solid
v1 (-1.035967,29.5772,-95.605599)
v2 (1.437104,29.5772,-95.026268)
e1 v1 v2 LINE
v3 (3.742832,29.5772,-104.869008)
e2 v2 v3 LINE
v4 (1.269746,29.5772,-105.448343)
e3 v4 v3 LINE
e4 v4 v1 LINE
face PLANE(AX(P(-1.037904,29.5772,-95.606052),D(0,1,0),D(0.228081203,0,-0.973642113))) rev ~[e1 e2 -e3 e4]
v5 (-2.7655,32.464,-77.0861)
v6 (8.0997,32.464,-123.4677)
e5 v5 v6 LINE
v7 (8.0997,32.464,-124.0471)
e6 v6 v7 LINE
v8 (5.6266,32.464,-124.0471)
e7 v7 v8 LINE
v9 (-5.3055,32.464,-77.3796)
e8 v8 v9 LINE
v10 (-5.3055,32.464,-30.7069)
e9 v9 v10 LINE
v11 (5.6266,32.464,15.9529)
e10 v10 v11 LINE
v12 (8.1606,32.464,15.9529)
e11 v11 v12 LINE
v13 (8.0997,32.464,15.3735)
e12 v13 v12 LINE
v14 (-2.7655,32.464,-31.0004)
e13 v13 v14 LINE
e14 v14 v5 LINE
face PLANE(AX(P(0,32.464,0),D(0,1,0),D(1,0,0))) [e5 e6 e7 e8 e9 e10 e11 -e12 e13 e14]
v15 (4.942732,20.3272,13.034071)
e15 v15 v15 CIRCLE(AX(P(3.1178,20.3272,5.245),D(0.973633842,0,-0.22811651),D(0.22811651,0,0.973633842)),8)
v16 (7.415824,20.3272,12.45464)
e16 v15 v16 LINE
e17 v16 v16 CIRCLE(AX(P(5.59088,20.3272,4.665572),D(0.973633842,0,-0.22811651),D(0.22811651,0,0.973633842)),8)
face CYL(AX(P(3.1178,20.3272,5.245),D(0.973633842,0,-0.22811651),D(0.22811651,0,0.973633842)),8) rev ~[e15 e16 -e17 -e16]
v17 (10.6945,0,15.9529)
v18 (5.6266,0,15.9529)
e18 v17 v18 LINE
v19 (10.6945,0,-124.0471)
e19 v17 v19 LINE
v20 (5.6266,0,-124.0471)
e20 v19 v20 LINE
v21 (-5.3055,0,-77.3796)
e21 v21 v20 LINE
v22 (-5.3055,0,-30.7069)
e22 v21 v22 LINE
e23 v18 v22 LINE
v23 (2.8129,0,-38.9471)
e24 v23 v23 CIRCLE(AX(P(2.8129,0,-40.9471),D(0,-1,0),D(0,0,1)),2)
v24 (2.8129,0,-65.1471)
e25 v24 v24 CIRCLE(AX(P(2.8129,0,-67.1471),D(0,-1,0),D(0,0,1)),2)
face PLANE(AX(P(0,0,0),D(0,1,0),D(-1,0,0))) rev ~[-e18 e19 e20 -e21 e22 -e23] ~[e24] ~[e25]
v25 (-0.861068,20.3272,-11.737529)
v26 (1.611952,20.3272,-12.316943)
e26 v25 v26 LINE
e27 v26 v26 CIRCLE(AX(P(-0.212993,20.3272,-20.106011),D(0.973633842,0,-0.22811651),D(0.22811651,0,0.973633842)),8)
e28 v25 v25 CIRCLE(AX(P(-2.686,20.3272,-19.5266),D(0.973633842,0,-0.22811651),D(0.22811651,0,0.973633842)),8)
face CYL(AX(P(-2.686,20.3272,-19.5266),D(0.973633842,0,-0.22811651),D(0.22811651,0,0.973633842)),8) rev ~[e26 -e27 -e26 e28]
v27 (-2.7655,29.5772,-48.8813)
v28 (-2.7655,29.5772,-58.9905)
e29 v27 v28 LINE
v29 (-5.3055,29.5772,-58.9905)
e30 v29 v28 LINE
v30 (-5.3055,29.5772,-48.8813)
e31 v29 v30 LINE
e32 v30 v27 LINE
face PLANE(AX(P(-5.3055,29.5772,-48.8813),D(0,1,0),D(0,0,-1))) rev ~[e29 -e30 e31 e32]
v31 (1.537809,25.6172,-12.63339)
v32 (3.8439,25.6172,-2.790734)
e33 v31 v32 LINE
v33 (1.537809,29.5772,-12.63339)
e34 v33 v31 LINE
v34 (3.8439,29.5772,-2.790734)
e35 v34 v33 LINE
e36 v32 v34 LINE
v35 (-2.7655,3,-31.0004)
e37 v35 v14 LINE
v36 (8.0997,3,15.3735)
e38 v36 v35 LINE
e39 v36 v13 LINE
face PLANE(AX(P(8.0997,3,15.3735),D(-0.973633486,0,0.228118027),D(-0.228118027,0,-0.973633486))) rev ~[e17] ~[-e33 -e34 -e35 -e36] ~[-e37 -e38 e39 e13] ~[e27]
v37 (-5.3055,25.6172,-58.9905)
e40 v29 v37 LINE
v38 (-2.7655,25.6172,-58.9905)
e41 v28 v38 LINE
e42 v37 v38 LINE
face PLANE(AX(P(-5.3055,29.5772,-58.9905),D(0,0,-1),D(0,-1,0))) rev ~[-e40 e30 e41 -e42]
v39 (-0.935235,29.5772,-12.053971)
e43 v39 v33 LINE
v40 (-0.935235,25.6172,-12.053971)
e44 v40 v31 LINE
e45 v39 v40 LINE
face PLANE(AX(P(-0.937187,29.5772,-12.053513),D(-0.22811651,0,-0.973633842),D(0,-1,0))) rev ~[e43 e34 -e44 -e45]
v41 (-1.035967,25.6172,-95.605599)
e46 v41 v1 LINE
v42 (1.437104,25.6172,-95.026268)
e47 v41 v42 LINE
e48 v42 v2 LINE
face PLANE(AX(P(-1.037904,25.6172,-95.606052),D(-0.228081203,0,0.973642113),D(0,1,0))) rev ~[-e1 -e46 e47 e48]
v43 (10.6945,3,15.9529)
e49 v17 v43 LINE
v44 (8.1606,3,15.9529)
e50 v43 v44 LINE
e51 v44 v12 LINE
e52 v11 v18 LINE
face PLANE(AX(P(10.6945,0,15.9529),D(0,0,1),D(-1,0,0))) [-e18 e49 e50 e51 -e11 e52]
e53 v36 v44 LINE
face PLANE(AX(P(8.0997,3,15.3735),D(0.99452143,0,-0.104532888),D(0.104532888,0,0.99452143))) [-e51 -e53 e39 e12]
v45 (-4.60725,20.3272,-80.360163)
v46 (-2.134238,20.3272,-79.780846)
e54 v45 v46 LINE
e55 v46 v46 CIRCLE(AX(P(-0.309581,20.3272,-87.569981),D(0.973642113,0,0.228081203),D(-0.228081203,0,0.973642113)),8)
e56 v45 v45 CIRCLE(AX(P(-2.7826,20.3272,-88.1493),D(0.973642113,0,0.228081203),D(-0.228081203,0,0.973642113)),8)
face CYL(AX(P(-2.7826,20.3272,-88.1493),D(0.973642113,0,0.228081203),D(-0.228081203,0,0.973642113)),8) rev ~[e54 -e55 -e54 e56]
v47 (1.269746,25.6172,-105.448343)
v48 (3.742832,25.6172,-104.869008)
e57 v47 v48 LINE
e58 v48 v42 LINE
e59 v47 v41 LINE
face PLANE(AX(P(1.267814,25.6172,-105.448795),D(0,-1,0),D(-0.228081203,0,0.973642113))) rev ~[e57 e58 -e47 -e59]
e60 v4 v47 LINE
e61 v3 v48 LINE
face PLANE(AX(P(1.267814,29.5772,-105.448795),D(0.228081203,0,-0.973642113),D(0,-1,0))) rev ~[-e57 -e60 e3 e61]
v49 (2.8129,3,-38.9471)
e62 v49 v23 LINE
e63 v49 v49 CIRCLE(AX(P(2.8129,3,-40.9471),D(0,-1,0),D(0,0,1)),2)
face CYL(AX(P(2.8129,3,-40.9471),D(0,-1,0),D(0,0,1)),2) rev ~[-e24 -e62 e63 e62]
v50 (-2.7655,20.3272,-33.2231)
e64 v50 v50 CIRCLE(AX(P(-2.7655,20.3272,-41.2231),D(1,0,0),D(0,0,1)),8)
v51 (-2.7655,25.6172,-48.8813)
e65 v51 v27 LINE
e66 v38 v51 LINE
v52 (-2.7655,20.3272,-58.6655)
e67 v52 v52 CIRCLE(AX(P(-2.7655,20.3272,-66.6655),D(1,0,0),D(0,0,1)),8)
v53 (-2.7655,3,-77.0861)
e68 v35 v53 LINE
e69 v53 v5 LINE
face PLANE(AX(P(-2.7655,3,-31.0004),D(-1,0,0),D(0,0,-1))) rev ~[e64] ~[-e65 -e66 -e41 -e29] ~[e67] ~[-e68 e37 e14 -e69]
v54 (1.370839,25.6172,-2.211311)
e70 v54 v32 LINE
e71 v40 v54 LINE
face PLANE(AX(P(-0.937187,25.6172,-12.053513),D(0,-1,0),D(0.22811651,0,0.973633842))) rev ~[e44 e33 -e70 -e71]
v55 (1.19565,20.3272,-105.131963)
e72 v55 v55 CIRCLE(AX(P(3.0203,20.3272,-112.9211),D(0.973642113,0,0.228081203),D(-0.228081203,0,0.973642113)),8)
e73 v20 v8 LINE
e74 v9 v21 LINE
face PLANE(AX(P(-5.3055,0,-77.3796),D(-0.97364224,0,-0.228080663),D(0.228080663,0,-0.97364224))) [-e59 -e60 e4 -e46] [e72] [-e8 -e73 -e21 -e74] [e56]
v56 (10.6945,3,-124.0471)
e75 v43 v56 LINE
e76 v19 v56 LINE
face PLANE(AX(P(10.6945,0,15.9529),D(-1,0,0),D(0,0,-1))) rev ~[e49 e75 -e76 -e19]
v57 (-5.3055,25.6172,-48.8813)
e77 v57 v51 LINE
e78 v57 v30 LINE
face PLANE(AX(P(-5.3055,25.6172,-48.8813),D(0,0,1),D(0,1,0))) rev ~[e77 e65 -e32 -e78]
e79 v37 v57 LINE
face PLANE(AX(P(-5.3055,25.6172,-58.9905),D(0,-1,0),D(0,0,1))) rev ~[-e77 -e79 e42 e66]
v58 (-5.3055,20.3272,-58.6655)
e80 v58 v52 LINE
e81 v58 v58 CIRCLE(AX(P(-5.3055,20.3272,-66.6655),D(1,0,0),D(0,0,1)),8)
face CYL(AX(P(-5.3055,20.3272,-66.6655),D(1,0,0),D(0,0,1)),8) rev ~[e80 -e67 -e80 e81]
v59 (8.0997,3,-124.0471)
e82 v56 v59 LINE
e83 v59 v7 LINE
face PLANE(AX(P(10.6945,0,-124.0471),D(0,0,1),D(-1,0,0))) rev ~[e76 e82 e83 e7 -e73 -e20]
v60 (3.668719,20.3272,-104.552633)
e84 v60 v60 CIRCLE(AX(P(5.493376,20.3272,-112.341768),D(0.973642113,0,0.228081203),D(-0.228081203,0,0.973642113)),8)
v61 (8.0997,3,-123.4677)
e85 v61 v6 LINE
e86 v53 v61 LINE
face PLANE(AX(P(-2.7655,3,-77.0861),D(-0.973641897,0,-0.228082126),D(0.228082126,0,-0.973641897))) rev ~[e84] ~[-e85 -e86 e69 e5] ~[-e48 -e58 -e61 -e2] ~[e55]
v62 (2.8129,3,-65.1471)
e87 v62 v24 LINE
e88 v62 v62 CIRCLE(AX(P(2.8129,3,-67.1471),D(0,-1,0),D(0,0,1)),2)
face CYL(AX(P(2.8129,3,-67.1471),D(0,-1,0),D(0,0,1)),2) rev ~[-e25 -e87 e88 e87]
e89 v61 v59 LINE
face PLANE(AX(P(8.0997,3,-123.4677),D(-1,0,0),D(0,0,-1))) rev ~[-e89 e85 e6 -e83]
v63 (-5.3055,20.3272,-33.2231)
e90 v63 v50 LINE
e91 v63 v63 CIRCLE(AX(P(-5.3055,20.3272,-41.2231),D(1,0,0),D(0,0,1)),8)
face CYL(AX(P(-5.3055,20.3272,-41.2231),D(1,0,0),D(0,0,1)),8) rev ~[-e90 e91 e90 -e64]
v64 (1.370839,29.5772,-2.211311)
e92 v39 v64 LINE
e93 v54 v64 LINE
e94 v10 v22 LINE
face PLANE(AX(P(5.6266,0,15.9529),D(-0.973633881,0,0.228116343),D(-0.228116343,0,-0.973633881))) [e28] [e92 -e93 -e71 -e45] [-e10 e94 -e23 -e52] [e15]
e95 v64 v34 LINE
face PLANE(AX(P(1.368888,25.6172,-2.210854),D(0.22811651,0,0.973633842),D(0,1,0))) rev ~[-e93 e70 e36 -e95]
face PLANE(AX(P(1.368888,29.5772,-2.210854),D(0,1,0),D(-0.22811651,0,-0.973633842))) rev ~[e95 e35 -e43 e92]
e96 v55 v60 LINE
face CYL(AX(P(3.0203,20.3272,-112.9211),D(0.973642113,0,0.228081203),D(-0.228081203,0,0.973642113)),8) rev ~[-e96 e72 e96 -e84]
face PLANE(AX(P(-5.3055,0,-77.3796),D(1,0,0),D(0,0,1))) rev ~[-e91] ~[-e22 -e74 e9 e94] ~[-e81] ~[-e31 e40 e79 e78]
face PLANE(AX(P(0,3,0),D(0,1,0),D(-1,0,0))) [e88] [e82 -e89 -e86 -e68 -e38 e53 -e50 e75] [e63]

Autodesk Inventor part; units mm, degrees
ref_plane "YZ Plane" through (0, 0, 0) normal (1, 0, 0) x (0, 1, 0)
ref_plane "XZ Plane" through (0, 0, 0) normal (0, 1, 0) x (-1, 0, 0)
ref_plane "XY Plane" through (0, 0, 0) normal (0, 0, 1) x (1, 0, 0)
sketch "Base" plane through (0, 0, 0) normal (0, 1, 0) x (-1, 0, 0)
  line L0 (-10.6945, 15.9529) -> (-10.6945, -124.0471)
  line L1 (5.3055, -77.3796) -> (5.3055, -30.7069)
  line L2 (-10.6945, 15.9529) -> (-5.6266, 15.9529)
  line L3 (-5.6266, 15.9529) -> (5.3055, -30.7069)
  line L4 (-10.6945, -124.0471) -> (-5.6266, -124.0471)
  line L5 (5.3055, -77.3796) -> (-5.6266, -124.0471)
  point P0 (0, 0)
  dimension "d1" = 140
extrude "Extrusion1" add sketch "Base" along normal blind 3
sketch "FrontWall" plane through (0, 3, 0) normal (0, 1, 0) x (1, 0, 0)
  line L0 (-5.3055, 30.7069) -> (5.6266, -15.9529) projected
  line L1 (-5.3055, 77.3796) -> (-5.3055, 30.7069) projected
  line L2 (5.6266, 124.0471) -> (-5.3055, 77.3796) projected
  line L3 (8.0997, -15.3735) -> (-2.7655, 31.0004)
  line L4 (-2.7655, 31.0004) -> (-2.7655, 77.0861)
  line L5 (-2.7655, 77.0861) -> (8.0997, 123.4677)
  line L6 (8.0997, -15.3735) -> (8.1606, -15.9529)
  line L7 (5.6266, -15.9529) -> (10.6945, -15.9529) projected
  line L8 (8.0997, 123.4677) -> (8.0997, 124.0471)
  line L9 (10.6945, 124.0471) -> (5.6266, 124.0471) projected
  point P0 (0, 0)
  dimension "d6" = 2.54
extrude "Extrusion2" add sketch "FrontWall" along normal blind 29.464
sketch "Sketch3" plane through (-5.3055, 0, -77.3796) normal (-0.9736421, 0, -0.2280812) x (-0.2280812, 0, 0.9736421)
  line L0 (-47.9308, 0) -> (-47.9308, 32.464) projected
  line L1 (0, 0) -> (0, 32.464) projected
  line L2 (-1.0536, 30.5772) -> (-46.5036, 30.5772)
  line L3 (-46.5036, 30.5772) -> (-46.5036, 10.0772)
  line L4 (-46.5036, 10.0772) -> (-1.0536, 10.0772)
  line L5 (-1.0536, 10.0772) -> (-1.0536, 30.5772)
  line L6 (-23.7786, 29.5772) -> (-28.8286, 29.5772)
  line L7 (-28.8286, 29.5772) -> (-28.8286, 25.6172)
  line L8 (-28.8286, 25.6172) -> (-18.7194, 25.6172)
  line L9 (-18.7194, 25.6172) -> (-18.7194, 29.5772)
  line L10 (-18.7194, 29.5772) -> (-23.7786, 29.5772)
  point P0 (74.13, 0)
  point P1 (-36.5036, 20.3272)
  point P2 (-11.0612, 20.3272)
  dimension "d9" = 47.9308
  dimension "d10" = 45.45
  dimension "d11" = 20.5
hole "Hole1" at (-2.7826, 20.3272, -88.1493) at (3.0203, 20.3272, -112.9211) direction (0.9736421, 0, 0.2280812) diameter 16 end through all
extrude "Extrusion3" cut sketch "Sketch3" against normal blind 29.464 contours L10 L9 L8 L7 L6
sketch "Sketch4" plane through (-5.3055, 0, -77.3796) normal (-1, 0, 0) x (0, 0, 1)
  point P0 (77.3796, 0)
sketch "Sketch5" plane through (-5.3055, 0, -77.3796) normal (-1, 0, 0) x (0, 0, 1)
  line L0 (-47.9308, 0) -> (-47.9308, 32.464)
  line L1 (0, 0) -> (0, 32.464)
  line L2 (46.1641, 30.5772) -> (0.7141, 30.5772)
  line L3 (0.7141, 30.5772) -> (0.7141, 10.0772)
  line L4 (0.7141, 10.0772) -> (46.1641, 10.0772)
  line L5 (46.1641, 10.0772) -> (46.1641, 30.5772)
  line L6 (23.4391, 29.5772) -> (18.3891, 29.5772)
  line L7 (18.3891, 29.5772) -> (18.3891, 25.6172)
  line L8 (18.3891, 25.6172) -> (28.4983, 25.6172)
  line L9 (28.4983, 25.6172) -> (28.4983, 29.5772)
  line L10 (28.4983, 29.5772) -> (23.4391, 29.5772)
  point P0 (77.3796, 0)
  point P1 (74.13, 0)
  point P2 (10.7141, 20.3272)
  point P3 (36.1565, 20.3272)
  dimension "d27" = 47.9308
  dimension "d28" = 45.45
  dimension "d29" = 20.5
hole "Hole2" at (-5.3055, 20.3272, -41.2231) at (-5.3055, 20.3272, -66.6655) direction (1, 0, 0) diameter 16 end through all
extrude "Extrusion4" cut sketch "Sketch5" against normal blind 29.464 contours L10 L9 L8 L7 L6
sketch "Sketch6" plane through (5.6266, 0, 15.9529) normal (-0.9736338, 0, 0.2281165) x (0.2281165, 0, 0.9736338)
  line L0 (-47.9308, 0) -> (-47.9308, 32.464)
  line L1 (-47.1544, 0) -> (-47.1544, 32.464)
  line L2 (-0.9903, 30.5772) -> (-46.4403, 30.5772)
  line L3 (-46.4403, 30.5772) -> (-46.4403, 10.0772)
  line L4 (-46.4403, 10.0772) -> (-0.9903, 10.0772)
  line L5 (-0.9903, 10.0772) -> (-0.9903, 30.5772)
  line L6 (-23.7153, 29.5772) -> (-28.7653, 29.5772)
  line L7 (-28.7653, 29.5772) -> (-28.7653, 25.6172)
  line L8 (-28.7653, 25.6172) -> (-18.6561, 25.6172)
  line L9 (-18.6561, 25.6172) -> (-18.6561, 29.5772)
  line L10 (-18.6561, 29.5772) -> (-23.7153, 29.5772)
  point P0 (-16.8159, 0)
  point P1 (77.3796, 0)
  point P2 (74.13, 0)
  point P3 (-36.4403, 20.3272)
  point P4 (-10.9979, 20.3272)
  dimension "d39" = 0.7874
  dimension "d40" = 45.45
  dimension "d41" = 20.5
hole "Hole3" at (-2.686, 20.3272, -19.5266) at (3.1178, 20.3272, 5.245) direction (0.9736338, 0, -0.2281165) diameter 16 end through all
extrude "Extrusion5" cut sketch "Sketch6" against normal blind 29.464 contours L10 L9 L8 L7 L6
sketch "Sketch7" plane through (0, 3, 0) normal (0, 1, 0) x (1, 0, 0)
  line L0 (10.6945, 124.0471) -> (10.6945, -15.9529) projected
  point P0 (0, 0)
  point P1 (2.8129, 67.1471)
  point P2 (2.8129, 40.9471)
hole "Hole4" at (2.8129, 3, -40.9471) at (2.8129, 3, -67.1471) direction (0, -1, 0) diameter 4 end through all
properties part number "UltrasonicSensorMount"
